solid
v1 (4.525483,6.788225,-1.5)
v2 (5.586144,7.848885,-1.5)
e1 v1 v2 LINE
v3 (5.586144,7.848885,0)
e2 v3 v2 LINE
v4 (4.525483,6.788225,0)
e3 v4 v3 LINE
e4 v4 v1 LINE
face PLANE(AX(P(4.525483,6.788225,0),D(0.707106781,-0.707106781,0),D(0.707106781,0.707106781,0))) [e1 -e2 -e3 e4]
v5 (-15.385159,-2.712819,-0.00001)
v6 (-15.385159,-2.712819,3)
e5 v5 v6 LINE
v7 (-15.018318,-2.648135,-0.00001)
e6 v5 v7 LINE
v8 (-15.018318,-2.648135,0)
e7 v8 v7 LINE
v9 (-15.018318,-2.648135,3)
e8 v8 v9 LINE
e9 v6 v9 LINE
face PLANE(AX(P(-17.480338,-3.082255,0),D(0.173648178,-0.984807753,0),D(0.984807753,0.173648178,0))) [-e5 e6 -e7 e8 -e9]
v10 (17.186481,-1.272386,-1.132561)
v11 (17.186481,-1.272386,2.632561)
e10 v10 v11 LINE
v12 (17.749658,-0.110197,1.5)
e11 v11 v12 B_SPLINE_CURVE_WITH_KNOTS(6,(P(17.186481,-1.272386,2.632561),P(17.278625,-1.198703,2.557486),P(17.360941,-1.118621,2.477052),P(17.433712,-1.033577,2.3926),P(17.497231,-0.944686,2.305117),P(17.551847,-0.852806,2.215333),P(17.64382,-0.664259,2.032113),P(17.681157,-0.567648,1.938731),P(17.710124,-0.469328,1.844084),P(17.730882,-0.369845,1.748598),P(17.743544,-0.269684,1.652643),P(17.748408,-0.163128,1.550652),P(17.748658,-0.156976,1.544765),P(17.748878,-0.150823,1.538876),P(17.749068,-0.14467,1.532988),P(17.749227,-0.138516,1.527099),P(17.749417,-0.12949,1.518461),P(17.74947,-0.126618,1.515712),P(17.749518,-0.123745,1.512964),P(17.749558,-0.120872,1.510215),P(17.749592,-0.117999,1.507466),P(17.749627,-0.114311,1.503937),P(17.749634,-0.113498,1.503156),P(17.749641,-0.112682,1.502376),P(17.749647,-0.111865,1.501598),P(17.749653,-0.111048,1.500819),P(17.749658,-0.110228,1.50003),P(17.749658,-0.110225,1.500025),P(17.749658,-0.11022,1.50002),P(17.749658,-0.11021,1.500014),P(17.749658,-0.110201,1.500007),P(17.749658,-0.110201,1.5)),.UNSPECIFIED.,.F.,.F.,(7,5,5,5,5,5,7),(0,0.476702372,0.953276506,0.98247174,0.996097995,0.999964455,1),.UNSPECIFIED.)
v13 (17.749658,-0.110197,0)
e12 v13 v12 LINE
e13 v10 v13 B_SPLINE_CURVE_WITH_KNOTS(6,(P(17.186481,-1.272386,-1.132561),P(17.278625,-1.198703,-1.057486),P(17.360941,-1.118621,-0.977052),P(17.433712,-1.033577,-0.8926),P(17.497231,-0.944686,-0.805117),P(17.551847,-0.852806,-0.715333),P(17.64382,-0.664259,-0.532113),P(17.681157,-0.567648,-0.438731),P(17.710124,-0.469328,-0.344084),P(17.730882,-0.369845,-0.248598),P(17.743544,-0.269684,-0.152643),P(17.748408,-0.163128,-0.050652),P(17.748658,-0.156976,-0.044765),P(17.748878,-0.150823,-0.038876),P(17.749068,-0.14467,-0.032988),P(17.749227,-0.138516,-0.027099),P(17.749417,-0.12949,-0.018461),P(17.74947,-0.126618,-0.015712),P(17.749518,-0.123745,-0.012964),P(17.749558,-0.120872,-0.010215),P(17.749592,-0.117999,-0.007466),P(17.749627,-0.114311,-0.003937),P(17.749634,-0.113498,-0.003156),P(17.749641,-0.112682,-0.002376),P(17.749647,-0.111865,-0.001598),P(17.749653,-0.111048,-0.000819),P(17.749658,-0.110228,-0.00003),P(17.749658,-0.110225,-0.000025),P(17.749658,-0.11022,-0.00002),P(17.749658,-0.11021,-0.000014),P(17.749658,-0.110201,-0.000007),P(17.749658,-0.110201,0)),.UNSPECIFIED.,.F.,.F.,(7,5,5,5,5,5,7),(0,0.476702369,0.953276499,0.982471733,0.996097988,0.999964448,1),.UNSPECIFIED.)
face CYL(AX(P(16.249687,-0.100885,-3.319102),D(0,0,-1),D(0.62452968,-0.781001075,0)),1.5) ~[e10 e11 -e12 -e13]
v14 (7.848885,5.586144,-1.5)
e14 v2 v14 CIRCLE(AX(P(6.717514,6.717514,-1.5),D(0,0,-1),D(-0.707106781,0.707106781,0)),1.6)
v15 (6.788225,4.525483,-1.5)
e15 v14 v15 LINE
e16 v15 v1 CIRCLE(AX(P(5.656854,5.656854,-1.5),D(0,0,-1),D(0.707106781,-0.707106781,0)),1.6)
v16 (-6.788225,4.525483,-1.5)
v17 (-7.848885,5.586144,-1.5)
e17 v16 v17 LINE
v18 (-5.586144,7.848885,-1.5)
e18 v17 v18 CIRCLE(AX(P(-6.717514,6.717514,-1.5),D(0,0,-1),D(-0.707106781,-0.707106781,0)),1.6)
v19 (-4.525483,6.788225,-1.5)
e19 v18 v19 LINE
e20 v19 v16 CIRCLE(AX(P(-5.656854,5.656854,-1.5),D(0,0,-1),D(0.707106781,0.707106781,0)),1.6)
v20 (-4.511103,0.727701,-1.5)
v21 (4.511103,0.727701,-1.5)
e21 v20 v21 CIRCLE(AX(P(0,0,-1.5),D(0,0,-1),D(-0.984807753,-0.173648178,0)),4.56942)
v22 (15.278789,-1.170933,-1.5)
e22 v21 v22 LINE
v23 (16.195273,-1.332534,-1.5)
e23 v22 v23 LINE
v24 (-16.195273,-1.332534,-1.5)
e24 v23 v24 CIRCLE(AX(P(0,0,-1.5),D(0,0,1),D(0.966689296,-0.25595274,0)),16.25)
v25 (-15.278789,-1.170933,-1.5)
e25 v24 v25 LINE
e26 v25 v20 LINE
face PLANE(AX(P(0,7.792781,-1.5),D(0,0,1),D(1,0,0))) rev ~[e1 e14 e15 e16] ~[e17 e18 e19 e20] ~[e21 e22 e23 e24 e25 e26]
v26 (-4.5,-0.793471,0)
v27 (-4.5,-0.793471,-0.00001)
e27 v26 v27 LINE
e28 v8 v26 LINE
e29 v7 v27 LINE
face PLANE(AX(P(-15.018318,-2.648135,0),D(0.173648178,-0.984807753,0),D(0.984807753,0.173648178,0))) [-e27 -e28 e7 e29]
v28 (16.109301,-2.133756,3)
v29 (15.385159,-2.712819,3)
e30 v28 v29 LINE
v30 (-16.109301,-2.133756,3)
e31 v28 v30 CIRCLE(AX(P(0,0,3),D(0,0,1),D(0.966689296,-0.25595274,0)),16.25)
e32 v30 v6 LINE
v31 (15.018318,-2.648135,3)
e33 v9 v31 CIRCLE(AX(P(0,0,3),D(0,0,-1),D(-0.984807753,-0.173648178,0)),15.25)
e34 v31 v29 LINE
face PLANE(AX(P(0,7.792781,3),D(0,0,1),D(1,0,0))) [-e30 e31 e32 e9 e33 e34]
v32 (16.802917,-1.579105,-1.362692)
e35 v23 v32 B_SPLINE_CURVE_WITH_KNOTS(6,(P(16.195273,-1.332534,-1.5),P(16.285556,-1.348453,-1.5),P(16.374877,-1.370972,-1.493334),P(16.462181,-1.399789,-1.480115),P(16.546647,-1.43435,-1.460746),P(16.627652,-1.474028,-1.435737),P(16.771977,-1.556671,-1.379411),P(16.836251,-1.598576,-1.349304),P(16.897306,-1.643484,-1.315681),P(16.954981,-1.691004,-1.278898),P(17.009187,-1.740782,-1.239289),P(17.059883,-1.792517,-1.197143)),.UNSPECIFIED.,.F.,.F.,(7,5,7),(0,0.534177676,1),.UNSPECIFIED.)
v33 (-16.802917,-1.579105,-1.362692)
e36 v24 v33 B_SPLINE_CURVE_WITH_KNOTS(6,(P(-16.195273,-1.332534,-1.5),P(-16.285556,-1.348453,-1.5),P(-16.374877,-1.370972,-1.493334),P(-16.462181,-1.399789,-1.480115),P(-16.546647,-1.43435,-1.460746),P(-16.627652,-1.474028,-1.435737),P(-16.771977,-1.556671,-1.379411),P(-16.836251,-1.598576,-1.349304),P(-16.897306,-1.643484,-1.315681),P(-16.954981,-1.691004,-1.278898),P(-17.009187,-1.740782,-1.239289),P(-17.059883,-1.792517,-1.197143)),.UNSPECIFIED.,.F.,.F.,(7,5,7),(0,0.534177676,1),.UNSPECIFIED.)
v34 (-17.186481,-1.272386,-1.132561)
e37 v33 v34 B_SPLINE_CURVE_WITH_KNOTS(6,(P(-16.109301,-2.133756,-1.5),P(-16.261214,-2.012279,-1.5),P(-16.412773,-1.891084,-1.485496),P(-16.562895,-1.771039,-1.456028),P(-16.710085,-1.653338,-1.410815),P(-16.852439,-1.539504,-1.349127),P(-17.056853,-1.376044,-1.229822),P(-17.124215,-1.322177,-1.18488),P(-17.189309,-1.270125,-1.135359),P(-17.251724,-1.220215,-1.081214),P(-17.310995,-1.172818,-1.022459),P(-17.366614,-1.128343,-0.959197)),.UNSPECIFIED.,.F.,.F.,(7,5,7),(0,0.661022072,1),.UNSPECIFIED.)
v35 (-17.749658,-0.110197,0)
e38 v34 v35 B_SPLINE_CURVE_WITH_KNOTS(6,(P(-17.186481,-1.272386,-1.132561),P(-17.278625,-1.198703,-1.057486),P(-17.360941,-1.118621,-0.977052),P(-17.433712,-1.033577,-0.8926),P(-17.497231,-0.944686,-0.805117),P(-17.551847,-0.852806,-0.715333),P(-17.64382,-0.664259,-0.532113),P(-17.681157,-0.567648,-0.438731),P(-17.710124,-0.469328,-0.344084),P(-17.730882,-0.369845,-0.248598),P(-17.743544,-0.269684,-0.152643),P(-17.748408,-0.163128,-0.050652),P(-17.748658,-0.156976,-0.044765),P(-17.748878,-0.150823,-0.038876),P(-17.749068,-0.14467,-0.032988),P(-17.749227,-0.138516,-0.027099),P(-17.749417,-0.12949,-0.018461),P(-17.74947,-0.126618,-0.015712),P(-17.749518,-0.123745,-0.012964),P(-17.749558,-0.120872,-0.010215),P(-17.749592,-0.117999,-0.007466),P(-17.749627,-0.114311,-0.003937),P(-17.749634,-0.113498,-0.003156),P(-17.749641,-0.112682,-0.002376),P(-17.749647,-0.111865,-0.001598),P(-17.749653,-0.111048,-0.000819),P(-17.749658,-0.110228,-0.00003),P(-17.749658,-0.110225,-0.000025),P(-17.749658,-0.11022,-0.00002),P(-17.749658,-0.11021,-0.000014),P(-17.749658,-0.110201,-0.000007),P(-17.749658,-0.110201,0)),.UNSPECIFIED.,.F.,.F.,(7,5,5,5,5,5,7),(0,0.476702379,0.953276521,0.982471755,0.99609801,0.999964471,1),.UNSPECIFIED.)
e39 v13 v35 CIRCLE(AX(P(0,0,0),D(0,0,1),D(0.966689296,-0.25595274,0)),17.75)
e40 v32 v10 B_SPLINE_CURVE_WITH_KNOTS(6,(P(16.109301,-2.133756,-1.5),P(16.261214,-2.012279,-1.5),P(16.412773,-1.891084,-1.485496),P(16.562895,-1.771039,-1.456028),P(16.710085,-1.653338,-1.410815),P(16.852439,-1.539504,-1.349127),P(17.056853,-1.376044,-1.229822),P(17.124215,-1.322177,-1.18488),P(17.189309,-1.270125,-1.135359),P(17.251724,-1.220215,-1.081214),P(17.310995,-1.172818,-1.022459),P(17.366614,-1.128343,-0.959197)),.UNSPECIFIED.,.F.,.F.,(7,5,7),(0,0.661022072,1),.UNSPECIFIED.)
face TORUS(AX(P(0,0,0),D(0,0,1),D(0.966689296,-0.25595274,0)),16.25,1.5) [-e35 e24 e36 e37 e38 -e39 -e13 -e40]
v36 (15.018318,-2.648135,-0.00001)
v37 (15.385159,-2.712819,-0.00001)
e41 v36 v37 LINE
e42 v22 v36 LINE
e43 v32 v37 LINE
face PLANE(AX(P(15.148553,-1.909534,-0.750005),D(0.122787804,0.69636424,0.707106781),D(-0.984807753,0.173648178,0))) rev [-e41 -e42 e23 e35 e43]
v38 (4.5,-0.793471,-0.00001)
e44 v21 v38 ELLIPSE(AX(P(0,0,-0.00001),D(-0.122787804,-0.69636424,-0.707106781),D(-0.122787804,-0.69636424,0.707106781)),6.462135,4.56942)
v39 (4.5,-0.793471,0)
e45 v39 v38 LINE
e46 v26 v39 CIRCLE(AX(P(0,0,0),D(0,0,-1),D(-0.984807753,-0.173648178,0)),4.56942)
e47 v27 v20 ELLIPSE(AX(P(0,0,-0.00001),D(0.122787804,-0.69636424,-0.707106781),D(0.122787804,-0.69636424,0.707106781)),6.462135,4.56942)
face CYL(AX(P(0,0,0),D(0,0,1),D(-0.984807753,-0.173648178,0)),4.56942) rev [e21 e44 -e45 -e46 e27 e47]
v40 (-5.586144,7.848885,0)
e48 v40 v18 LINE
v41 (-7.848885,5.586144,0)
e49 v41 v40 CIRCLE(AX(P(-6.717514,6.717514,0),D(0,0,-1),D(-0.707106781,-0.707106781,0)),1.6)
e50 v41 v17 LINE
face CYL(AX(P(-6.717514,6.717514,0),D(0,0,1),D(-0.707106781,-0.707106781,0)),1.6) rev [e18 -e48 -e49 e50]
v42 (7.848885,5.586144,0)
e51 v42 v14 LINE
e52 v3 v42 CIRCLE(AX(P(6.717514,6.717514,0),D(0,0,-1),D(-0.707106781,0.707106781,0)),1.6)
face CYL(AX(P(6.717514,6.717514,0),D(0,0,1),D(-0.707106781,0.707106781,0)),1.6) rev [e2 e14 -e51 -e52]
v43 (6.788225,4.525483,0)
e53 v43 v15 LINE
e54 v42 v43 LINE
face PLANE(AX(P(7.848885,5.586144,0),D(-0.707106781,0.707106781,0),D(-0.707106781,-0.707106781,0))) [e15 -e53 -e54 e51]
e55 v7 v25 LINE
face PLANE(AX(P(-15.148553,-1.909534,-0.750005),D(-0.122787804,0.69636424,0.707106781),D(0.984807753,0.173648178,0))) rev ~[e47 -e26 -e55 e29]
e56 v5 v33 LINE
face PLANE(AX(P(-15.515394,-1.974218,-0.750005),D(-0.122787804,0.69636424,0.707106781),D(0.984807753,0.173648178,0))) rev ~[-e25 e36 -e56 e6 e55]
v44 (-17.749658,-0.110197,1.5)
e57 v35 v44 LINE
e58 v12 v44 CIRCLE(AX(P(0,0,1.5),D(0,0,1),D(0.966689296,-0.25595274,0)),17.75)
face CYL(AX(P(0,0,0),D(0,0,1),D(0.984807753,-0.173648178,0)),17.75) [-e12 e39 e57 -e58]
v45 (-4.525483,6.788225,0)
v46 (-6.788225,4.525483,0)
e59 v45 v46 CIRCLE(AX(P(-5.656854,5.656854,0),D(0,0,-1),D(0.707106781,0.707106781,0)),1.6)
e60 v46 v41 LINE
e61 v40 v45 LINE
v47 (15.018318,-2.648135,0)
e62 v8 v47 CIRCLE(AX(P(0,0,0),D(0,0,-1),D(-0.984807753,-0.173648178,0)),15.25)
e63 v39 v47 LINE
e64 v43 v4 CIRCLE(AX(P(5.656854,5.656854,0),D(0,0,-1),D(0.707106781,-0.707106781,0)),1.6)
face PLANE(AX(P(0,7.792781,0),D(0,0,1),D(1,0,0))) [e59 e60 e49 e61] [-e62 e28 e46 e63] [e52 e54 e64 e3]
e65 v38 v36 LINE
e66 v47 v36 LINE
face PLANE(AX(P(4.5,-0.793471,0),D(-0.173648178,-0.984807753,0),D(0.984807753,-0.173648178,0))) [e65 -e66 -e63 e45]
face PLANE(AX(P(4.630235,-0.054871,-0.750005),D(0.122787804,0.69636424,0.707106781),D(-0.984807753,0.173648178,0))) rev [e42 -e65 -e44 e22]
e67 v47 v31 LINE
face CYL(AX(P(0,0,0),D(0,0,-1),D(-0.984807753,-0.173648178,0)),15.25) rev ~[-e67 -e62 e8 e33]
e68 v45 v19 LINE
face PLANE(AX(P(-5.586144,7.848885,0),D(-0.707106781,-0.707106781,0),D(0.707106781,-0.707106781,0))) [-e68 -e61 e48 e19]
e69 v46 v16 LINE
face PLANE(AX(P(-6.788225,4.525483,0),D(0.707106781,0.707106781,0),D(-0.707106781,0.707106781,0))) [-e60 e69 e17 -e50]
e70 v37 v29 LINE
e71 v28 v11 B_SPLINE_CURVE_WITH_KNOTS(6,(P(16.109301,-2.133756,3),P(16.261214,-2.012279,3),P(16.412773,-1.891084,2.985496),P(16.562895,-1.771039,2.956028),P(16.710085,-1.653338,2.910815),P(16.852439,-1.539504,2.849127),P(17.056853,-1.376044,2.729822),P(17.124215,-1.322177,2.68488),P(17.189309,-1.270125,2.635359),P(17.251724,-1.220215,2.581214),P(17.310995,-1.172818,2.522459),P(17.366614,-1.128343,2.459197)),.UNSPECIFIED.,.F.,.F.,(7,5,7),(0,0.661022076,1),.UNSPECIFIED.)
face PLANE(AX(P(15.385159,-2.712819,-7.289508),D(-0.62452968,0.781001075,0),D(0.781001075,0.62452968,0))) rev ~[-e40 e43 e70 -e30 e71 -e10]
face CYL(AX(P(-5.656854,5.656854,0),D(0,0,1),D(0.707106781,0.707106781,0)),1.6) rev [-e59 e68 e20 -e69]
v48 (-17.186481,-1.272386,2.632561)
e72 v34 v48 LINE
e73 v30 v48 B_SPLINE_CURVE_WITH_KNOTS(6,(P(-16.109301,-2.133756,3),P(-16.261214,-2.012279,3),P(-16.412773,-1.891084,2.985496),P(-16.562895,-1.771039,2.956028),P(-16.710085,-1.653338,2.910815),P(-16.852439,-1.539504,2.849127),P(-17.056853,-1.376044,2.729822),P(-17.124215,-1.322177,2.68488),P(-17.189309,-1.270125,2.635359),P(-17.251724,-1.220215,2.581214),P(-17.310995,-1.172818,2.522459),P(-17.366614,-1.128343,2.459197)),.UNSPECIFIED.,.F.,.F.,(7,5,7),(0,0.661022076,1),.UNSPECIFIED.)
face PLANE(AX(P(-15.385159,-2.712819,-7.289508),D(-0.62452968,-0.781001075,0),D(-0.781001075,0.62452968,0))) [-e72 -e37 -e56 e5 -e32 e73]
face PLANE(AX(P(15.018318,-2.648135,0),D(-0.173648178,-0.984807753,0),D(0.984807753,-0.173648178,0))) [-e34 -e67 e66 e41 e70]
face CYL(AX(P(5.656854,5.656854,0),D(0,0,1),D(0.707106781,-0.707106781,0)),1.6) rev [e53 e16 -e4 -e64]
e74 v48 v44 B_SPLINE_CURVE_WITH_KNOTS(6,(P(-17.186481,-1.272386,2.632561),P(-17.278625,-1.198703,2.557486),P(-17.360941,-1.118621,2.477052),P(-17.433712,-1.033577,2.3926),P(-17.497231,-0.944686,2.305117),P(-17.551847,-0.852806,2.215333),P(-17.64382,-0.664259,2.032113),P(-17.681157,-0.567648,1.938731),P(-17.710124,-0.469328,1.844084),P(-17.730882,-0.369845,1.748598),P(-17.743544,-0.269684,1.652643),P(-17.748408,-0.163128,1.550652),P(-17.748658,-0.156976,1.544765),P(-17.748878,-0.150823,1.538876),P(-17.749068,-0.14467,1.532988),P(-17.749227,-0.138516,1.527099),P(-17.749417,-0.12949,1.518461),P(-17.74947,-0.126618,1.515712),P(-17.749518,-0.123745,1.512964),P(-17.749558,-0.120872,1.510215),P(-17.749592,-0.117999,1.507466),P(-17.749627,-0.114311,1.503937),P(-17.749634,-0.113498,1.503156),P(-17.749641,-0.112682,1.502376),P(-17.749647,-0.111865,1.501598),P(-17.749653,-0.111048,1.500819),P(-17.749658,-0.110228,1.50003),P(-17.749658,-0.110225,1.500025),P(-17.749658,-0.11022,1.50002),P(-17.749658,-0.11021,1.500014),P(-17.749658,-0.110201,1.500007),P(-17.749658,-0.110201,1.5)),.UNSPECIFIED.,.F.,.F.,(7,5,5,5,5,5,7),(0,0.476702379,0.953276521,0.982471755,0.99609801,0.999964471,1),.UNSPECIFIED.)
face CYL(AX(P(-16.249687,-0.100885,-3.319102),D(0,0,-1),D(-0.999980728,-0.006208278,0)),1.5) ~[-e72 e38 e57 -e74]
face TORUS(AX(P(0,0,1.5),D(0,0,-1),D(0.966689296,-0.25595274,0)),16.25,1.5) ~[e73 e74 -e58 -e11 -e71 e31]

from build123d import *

# Parameters (mm, degrees)
F1_DEPTH    = 3
F2_DEPTH    = 1.5
F3_T1_DEPTH = 16.0790165437
F4_SIZE     = 1.49999
F5_T1_DEPTH = 8.1382032795
F5_T4_ANGLE = 209.6600935854
F5_T6_ANGLE = 209.6600935854


# Not quite as in the source:
# - a fillet or chamfer that OpenCascade refuses, or shapes differently, is made with other operations: its cross-section is extruded or revolved along the edge and cut away or added
# - a fillet or chamfer is up to 0.001 mm smaller than in the source, because OpenCascade refuses the exact size


with BuildPart() as f1:
    # F0 (on Top) → F1 (new body)
    with BuildSketch(Plane.XY):
        with BuildLine():
            Line((-17.480337616, -3.0822551536), (-15.0183182334, -2.6481347094))
            ThreePointArc((-15.0183182334, -2.6481347094), (0, 15.25), (15.0183182334, -2.6481347094))
            Line((15.0183182334, -2.6481347094), (17.480337616, -3.0822551536))
            ThreePointArc((17.480337616, -3.0822551536), (0, 17.75), (-17.480337616, -3.0822551536))
        make_face()
    extrude(amount=F1_DEPTH)

    # F0 (on Top) → F2 (join)
    with BuildSketch(Plane.XY):
        with BuildLine():
            Line((-17.480337616, -3.0822551536), (-15.0183182334, -2.6481347094))
            ThreePointArc((-15.0183182334, -2.6481347094), (0, 15.25), (15.0183182334, -2.6481347094))
            Line((15.0183182334, -2.6481347094), (17.480337616, -3.0822551536))
            ThreePointArc((17.480337616, -3.0822551536), (0, 17.75), (-17.480337616, -3.0822551536))
        make_face()
        with BuildLine():
            Line((-15.0183182334, -2.6481347094), (-4.5, -0.7934714132))
            ThreePointArc((-4.5, -0.7934714132), (0, 4.5694197535), (4.5, -0.7934714132))
            Line((4.5, -0.7934714132), (15.0183182334, -2.6481347094))
            ThreePointArc((15.0183182334, -2.6481347094), (0, 15.25), (-15.0183182334, -2.6481347094))
        make_face()
        with BuildLine():
            Line((-5.5861435714, 7.8488852712), (-4.5254833996, 6.7882250994))
            ThreePointArc((-4.5254833996, 6.7882250994), (-4.5254833996, 4.5254833996), (-6.7882250994, 4.5254833996))
            Line((-6.7882250994, 4.5254833996), (-7.8488852712, 5.5861435714))
            ThreePointArc((-7.8488852712, 5.5861435714), (-7.8488852712, 7.8488852712), (-5.5861435714, 7.8488852712))
        make_face(mode=Mode.SUBTRACT)
        with BuildLine():
            ThreePointArc((6.7882250994, 4.5254833996), (4.5254833996, 4.5254833996), (4.5254833996, 6.7882250994))
            Line((4.5254833996, 6.7882250994), (5.5861435714, 7.8488852712))
            ThreePointArc((5.5861435714, 7.8488852712), (7.8488852712, 7.8488852712), (7.8488852712, 5.5861435714))
            Line((7.8488852712, 5.5861435714), (6.7882250994, 4.5254833996))
        make_face(mode=Mode.SUBTRACT)
    extrude(amount=-F2_DEPTH)

    # F3: chamfer of 2 on 2 edges, made by hand

    # F3_s2 → F3_t1 (cut)
    with BuildSketch(Plane.XY.offset(-7.2895082718)):
        with BuildLine():
            Line((-15.3851589244, -2.7128186209), (-17.7302273788, -0.8375781136))
            ThreePointArc((-17.7302273788, -0.8375781136), (-17.6441291813, -1.935769985), (-17.480337616, -3.0822551536))
            Line((-17.480337616, -3.0822551536), (-15.3851589244, -2.7128186209))
        make_face()
        with BuildLine():
            Line((15.3851589244, -2.7128186209), (17.7302273788, -0.8375781136))
            ThreePointArc((17.7302273788, -0.8375781136), (17.6441291813, -1.935769985), (17.480337616, -3.0822551536))
            Line((17.480337616, -3.0822551536), (15.3851589244, -2.7128186209))
        make_face()
    extrude(amount=F3_T1_DEPTH, mode=Mode.SUBTRACT)

    # F4 (size 1.5 in the source; OpenCascade refuses exactly that, so slightly less here)
    f4_edges = [f1.edges().sort_by_distance(p)[0] for p in [
        (9.942579, -1.753145, -1.5),
        (-9.942579, -1.753145, -1.5),
    ]]
    chamfer(f4_edges, length=F4_SIZE)

    # F5: fillet of radius 1.5 on 4 edges, made by hand

    # F5_s2 → F5_t1 (cut)
    with BuildSketch(Plane.XY.offset(-3.3191016398)):
        with BuildLine():
            ThreePointArc((-17.7496579301, -0.1101969358), (-17.5995489023, -0.7550040841), (-17.1864813575, -1.2723861308))
            Line((-17.1864813575, -1.2723861308), (-17.7302273788, -0.8375781136))
            ThreePointArc((-17.7302273788, -0.8375781136), (-17.7436703144, -0.4739871018), (-17.7496579301, -0.1101969358))
        make_face()
        with BuildLine():
            ThreePointArc((17.1864813575, -1.2723861308), (17.5995489023, -0.7550040841), (17.7496579301, -0.1101969358))
            ThreePointArc((17.7496579301, -0.1101969358), (17.7436703144, -0.4739871018), (17.7302273788, -0.8375781136))
            Line((17.7302273788, -0.8375781136), (17.1864813575, -1.2723861308))
        make_face()
    extrude(amount=F5_T1_DEPTH, mode=Mode.SUBTRACT)

    # F5_s3 → F5_t4 (revolve, cut)
    with BuildSketch(Plane(origin=(0, 0, 0), x_dir=(0, 0, 1), z_dir=(-0.2559527399, -0.966689296, 0))):
        with BuildLine():
            ThreePointArc((3, -16.25), (2.5606601718, -17.3106601718), (1.5, -17.75))
            Line((1.5, -17.75), (3, -17.75))
            Line((3, -17.75), (3, -16.25))
        make_face()
    revolve(axis=Axis((0, 0, 3), (0, 0, 1)), revolution_arc=F5_T4_ANGLE, mode=Mode.SUBTRACT)

    # F5_s5 → F5_t6 (revolve, cut)
    with BuildSketch(Plane(origin=(0, 0, 0), x_dir=(0, 0, 1), z_dir=(-0.2559527399, -0.966689296, 0))):
        with BuildLine():
            ThreePointArc((-1.5, -16.25), (-1.0606601718, -17.3106601718), (0, -17.75))
            Line((0, -17.75), (-1.5, -17.75))
            Line((-1.5, -17.75), (-1.5, -16.25))
        make_face()
    revolve(axis=Axis((0, 0, -1.5), (0, 0, 1)), revolution_arc=F5_T6_ANGLE, mode=Mode.SUBTRACT)


solid = f1.part
